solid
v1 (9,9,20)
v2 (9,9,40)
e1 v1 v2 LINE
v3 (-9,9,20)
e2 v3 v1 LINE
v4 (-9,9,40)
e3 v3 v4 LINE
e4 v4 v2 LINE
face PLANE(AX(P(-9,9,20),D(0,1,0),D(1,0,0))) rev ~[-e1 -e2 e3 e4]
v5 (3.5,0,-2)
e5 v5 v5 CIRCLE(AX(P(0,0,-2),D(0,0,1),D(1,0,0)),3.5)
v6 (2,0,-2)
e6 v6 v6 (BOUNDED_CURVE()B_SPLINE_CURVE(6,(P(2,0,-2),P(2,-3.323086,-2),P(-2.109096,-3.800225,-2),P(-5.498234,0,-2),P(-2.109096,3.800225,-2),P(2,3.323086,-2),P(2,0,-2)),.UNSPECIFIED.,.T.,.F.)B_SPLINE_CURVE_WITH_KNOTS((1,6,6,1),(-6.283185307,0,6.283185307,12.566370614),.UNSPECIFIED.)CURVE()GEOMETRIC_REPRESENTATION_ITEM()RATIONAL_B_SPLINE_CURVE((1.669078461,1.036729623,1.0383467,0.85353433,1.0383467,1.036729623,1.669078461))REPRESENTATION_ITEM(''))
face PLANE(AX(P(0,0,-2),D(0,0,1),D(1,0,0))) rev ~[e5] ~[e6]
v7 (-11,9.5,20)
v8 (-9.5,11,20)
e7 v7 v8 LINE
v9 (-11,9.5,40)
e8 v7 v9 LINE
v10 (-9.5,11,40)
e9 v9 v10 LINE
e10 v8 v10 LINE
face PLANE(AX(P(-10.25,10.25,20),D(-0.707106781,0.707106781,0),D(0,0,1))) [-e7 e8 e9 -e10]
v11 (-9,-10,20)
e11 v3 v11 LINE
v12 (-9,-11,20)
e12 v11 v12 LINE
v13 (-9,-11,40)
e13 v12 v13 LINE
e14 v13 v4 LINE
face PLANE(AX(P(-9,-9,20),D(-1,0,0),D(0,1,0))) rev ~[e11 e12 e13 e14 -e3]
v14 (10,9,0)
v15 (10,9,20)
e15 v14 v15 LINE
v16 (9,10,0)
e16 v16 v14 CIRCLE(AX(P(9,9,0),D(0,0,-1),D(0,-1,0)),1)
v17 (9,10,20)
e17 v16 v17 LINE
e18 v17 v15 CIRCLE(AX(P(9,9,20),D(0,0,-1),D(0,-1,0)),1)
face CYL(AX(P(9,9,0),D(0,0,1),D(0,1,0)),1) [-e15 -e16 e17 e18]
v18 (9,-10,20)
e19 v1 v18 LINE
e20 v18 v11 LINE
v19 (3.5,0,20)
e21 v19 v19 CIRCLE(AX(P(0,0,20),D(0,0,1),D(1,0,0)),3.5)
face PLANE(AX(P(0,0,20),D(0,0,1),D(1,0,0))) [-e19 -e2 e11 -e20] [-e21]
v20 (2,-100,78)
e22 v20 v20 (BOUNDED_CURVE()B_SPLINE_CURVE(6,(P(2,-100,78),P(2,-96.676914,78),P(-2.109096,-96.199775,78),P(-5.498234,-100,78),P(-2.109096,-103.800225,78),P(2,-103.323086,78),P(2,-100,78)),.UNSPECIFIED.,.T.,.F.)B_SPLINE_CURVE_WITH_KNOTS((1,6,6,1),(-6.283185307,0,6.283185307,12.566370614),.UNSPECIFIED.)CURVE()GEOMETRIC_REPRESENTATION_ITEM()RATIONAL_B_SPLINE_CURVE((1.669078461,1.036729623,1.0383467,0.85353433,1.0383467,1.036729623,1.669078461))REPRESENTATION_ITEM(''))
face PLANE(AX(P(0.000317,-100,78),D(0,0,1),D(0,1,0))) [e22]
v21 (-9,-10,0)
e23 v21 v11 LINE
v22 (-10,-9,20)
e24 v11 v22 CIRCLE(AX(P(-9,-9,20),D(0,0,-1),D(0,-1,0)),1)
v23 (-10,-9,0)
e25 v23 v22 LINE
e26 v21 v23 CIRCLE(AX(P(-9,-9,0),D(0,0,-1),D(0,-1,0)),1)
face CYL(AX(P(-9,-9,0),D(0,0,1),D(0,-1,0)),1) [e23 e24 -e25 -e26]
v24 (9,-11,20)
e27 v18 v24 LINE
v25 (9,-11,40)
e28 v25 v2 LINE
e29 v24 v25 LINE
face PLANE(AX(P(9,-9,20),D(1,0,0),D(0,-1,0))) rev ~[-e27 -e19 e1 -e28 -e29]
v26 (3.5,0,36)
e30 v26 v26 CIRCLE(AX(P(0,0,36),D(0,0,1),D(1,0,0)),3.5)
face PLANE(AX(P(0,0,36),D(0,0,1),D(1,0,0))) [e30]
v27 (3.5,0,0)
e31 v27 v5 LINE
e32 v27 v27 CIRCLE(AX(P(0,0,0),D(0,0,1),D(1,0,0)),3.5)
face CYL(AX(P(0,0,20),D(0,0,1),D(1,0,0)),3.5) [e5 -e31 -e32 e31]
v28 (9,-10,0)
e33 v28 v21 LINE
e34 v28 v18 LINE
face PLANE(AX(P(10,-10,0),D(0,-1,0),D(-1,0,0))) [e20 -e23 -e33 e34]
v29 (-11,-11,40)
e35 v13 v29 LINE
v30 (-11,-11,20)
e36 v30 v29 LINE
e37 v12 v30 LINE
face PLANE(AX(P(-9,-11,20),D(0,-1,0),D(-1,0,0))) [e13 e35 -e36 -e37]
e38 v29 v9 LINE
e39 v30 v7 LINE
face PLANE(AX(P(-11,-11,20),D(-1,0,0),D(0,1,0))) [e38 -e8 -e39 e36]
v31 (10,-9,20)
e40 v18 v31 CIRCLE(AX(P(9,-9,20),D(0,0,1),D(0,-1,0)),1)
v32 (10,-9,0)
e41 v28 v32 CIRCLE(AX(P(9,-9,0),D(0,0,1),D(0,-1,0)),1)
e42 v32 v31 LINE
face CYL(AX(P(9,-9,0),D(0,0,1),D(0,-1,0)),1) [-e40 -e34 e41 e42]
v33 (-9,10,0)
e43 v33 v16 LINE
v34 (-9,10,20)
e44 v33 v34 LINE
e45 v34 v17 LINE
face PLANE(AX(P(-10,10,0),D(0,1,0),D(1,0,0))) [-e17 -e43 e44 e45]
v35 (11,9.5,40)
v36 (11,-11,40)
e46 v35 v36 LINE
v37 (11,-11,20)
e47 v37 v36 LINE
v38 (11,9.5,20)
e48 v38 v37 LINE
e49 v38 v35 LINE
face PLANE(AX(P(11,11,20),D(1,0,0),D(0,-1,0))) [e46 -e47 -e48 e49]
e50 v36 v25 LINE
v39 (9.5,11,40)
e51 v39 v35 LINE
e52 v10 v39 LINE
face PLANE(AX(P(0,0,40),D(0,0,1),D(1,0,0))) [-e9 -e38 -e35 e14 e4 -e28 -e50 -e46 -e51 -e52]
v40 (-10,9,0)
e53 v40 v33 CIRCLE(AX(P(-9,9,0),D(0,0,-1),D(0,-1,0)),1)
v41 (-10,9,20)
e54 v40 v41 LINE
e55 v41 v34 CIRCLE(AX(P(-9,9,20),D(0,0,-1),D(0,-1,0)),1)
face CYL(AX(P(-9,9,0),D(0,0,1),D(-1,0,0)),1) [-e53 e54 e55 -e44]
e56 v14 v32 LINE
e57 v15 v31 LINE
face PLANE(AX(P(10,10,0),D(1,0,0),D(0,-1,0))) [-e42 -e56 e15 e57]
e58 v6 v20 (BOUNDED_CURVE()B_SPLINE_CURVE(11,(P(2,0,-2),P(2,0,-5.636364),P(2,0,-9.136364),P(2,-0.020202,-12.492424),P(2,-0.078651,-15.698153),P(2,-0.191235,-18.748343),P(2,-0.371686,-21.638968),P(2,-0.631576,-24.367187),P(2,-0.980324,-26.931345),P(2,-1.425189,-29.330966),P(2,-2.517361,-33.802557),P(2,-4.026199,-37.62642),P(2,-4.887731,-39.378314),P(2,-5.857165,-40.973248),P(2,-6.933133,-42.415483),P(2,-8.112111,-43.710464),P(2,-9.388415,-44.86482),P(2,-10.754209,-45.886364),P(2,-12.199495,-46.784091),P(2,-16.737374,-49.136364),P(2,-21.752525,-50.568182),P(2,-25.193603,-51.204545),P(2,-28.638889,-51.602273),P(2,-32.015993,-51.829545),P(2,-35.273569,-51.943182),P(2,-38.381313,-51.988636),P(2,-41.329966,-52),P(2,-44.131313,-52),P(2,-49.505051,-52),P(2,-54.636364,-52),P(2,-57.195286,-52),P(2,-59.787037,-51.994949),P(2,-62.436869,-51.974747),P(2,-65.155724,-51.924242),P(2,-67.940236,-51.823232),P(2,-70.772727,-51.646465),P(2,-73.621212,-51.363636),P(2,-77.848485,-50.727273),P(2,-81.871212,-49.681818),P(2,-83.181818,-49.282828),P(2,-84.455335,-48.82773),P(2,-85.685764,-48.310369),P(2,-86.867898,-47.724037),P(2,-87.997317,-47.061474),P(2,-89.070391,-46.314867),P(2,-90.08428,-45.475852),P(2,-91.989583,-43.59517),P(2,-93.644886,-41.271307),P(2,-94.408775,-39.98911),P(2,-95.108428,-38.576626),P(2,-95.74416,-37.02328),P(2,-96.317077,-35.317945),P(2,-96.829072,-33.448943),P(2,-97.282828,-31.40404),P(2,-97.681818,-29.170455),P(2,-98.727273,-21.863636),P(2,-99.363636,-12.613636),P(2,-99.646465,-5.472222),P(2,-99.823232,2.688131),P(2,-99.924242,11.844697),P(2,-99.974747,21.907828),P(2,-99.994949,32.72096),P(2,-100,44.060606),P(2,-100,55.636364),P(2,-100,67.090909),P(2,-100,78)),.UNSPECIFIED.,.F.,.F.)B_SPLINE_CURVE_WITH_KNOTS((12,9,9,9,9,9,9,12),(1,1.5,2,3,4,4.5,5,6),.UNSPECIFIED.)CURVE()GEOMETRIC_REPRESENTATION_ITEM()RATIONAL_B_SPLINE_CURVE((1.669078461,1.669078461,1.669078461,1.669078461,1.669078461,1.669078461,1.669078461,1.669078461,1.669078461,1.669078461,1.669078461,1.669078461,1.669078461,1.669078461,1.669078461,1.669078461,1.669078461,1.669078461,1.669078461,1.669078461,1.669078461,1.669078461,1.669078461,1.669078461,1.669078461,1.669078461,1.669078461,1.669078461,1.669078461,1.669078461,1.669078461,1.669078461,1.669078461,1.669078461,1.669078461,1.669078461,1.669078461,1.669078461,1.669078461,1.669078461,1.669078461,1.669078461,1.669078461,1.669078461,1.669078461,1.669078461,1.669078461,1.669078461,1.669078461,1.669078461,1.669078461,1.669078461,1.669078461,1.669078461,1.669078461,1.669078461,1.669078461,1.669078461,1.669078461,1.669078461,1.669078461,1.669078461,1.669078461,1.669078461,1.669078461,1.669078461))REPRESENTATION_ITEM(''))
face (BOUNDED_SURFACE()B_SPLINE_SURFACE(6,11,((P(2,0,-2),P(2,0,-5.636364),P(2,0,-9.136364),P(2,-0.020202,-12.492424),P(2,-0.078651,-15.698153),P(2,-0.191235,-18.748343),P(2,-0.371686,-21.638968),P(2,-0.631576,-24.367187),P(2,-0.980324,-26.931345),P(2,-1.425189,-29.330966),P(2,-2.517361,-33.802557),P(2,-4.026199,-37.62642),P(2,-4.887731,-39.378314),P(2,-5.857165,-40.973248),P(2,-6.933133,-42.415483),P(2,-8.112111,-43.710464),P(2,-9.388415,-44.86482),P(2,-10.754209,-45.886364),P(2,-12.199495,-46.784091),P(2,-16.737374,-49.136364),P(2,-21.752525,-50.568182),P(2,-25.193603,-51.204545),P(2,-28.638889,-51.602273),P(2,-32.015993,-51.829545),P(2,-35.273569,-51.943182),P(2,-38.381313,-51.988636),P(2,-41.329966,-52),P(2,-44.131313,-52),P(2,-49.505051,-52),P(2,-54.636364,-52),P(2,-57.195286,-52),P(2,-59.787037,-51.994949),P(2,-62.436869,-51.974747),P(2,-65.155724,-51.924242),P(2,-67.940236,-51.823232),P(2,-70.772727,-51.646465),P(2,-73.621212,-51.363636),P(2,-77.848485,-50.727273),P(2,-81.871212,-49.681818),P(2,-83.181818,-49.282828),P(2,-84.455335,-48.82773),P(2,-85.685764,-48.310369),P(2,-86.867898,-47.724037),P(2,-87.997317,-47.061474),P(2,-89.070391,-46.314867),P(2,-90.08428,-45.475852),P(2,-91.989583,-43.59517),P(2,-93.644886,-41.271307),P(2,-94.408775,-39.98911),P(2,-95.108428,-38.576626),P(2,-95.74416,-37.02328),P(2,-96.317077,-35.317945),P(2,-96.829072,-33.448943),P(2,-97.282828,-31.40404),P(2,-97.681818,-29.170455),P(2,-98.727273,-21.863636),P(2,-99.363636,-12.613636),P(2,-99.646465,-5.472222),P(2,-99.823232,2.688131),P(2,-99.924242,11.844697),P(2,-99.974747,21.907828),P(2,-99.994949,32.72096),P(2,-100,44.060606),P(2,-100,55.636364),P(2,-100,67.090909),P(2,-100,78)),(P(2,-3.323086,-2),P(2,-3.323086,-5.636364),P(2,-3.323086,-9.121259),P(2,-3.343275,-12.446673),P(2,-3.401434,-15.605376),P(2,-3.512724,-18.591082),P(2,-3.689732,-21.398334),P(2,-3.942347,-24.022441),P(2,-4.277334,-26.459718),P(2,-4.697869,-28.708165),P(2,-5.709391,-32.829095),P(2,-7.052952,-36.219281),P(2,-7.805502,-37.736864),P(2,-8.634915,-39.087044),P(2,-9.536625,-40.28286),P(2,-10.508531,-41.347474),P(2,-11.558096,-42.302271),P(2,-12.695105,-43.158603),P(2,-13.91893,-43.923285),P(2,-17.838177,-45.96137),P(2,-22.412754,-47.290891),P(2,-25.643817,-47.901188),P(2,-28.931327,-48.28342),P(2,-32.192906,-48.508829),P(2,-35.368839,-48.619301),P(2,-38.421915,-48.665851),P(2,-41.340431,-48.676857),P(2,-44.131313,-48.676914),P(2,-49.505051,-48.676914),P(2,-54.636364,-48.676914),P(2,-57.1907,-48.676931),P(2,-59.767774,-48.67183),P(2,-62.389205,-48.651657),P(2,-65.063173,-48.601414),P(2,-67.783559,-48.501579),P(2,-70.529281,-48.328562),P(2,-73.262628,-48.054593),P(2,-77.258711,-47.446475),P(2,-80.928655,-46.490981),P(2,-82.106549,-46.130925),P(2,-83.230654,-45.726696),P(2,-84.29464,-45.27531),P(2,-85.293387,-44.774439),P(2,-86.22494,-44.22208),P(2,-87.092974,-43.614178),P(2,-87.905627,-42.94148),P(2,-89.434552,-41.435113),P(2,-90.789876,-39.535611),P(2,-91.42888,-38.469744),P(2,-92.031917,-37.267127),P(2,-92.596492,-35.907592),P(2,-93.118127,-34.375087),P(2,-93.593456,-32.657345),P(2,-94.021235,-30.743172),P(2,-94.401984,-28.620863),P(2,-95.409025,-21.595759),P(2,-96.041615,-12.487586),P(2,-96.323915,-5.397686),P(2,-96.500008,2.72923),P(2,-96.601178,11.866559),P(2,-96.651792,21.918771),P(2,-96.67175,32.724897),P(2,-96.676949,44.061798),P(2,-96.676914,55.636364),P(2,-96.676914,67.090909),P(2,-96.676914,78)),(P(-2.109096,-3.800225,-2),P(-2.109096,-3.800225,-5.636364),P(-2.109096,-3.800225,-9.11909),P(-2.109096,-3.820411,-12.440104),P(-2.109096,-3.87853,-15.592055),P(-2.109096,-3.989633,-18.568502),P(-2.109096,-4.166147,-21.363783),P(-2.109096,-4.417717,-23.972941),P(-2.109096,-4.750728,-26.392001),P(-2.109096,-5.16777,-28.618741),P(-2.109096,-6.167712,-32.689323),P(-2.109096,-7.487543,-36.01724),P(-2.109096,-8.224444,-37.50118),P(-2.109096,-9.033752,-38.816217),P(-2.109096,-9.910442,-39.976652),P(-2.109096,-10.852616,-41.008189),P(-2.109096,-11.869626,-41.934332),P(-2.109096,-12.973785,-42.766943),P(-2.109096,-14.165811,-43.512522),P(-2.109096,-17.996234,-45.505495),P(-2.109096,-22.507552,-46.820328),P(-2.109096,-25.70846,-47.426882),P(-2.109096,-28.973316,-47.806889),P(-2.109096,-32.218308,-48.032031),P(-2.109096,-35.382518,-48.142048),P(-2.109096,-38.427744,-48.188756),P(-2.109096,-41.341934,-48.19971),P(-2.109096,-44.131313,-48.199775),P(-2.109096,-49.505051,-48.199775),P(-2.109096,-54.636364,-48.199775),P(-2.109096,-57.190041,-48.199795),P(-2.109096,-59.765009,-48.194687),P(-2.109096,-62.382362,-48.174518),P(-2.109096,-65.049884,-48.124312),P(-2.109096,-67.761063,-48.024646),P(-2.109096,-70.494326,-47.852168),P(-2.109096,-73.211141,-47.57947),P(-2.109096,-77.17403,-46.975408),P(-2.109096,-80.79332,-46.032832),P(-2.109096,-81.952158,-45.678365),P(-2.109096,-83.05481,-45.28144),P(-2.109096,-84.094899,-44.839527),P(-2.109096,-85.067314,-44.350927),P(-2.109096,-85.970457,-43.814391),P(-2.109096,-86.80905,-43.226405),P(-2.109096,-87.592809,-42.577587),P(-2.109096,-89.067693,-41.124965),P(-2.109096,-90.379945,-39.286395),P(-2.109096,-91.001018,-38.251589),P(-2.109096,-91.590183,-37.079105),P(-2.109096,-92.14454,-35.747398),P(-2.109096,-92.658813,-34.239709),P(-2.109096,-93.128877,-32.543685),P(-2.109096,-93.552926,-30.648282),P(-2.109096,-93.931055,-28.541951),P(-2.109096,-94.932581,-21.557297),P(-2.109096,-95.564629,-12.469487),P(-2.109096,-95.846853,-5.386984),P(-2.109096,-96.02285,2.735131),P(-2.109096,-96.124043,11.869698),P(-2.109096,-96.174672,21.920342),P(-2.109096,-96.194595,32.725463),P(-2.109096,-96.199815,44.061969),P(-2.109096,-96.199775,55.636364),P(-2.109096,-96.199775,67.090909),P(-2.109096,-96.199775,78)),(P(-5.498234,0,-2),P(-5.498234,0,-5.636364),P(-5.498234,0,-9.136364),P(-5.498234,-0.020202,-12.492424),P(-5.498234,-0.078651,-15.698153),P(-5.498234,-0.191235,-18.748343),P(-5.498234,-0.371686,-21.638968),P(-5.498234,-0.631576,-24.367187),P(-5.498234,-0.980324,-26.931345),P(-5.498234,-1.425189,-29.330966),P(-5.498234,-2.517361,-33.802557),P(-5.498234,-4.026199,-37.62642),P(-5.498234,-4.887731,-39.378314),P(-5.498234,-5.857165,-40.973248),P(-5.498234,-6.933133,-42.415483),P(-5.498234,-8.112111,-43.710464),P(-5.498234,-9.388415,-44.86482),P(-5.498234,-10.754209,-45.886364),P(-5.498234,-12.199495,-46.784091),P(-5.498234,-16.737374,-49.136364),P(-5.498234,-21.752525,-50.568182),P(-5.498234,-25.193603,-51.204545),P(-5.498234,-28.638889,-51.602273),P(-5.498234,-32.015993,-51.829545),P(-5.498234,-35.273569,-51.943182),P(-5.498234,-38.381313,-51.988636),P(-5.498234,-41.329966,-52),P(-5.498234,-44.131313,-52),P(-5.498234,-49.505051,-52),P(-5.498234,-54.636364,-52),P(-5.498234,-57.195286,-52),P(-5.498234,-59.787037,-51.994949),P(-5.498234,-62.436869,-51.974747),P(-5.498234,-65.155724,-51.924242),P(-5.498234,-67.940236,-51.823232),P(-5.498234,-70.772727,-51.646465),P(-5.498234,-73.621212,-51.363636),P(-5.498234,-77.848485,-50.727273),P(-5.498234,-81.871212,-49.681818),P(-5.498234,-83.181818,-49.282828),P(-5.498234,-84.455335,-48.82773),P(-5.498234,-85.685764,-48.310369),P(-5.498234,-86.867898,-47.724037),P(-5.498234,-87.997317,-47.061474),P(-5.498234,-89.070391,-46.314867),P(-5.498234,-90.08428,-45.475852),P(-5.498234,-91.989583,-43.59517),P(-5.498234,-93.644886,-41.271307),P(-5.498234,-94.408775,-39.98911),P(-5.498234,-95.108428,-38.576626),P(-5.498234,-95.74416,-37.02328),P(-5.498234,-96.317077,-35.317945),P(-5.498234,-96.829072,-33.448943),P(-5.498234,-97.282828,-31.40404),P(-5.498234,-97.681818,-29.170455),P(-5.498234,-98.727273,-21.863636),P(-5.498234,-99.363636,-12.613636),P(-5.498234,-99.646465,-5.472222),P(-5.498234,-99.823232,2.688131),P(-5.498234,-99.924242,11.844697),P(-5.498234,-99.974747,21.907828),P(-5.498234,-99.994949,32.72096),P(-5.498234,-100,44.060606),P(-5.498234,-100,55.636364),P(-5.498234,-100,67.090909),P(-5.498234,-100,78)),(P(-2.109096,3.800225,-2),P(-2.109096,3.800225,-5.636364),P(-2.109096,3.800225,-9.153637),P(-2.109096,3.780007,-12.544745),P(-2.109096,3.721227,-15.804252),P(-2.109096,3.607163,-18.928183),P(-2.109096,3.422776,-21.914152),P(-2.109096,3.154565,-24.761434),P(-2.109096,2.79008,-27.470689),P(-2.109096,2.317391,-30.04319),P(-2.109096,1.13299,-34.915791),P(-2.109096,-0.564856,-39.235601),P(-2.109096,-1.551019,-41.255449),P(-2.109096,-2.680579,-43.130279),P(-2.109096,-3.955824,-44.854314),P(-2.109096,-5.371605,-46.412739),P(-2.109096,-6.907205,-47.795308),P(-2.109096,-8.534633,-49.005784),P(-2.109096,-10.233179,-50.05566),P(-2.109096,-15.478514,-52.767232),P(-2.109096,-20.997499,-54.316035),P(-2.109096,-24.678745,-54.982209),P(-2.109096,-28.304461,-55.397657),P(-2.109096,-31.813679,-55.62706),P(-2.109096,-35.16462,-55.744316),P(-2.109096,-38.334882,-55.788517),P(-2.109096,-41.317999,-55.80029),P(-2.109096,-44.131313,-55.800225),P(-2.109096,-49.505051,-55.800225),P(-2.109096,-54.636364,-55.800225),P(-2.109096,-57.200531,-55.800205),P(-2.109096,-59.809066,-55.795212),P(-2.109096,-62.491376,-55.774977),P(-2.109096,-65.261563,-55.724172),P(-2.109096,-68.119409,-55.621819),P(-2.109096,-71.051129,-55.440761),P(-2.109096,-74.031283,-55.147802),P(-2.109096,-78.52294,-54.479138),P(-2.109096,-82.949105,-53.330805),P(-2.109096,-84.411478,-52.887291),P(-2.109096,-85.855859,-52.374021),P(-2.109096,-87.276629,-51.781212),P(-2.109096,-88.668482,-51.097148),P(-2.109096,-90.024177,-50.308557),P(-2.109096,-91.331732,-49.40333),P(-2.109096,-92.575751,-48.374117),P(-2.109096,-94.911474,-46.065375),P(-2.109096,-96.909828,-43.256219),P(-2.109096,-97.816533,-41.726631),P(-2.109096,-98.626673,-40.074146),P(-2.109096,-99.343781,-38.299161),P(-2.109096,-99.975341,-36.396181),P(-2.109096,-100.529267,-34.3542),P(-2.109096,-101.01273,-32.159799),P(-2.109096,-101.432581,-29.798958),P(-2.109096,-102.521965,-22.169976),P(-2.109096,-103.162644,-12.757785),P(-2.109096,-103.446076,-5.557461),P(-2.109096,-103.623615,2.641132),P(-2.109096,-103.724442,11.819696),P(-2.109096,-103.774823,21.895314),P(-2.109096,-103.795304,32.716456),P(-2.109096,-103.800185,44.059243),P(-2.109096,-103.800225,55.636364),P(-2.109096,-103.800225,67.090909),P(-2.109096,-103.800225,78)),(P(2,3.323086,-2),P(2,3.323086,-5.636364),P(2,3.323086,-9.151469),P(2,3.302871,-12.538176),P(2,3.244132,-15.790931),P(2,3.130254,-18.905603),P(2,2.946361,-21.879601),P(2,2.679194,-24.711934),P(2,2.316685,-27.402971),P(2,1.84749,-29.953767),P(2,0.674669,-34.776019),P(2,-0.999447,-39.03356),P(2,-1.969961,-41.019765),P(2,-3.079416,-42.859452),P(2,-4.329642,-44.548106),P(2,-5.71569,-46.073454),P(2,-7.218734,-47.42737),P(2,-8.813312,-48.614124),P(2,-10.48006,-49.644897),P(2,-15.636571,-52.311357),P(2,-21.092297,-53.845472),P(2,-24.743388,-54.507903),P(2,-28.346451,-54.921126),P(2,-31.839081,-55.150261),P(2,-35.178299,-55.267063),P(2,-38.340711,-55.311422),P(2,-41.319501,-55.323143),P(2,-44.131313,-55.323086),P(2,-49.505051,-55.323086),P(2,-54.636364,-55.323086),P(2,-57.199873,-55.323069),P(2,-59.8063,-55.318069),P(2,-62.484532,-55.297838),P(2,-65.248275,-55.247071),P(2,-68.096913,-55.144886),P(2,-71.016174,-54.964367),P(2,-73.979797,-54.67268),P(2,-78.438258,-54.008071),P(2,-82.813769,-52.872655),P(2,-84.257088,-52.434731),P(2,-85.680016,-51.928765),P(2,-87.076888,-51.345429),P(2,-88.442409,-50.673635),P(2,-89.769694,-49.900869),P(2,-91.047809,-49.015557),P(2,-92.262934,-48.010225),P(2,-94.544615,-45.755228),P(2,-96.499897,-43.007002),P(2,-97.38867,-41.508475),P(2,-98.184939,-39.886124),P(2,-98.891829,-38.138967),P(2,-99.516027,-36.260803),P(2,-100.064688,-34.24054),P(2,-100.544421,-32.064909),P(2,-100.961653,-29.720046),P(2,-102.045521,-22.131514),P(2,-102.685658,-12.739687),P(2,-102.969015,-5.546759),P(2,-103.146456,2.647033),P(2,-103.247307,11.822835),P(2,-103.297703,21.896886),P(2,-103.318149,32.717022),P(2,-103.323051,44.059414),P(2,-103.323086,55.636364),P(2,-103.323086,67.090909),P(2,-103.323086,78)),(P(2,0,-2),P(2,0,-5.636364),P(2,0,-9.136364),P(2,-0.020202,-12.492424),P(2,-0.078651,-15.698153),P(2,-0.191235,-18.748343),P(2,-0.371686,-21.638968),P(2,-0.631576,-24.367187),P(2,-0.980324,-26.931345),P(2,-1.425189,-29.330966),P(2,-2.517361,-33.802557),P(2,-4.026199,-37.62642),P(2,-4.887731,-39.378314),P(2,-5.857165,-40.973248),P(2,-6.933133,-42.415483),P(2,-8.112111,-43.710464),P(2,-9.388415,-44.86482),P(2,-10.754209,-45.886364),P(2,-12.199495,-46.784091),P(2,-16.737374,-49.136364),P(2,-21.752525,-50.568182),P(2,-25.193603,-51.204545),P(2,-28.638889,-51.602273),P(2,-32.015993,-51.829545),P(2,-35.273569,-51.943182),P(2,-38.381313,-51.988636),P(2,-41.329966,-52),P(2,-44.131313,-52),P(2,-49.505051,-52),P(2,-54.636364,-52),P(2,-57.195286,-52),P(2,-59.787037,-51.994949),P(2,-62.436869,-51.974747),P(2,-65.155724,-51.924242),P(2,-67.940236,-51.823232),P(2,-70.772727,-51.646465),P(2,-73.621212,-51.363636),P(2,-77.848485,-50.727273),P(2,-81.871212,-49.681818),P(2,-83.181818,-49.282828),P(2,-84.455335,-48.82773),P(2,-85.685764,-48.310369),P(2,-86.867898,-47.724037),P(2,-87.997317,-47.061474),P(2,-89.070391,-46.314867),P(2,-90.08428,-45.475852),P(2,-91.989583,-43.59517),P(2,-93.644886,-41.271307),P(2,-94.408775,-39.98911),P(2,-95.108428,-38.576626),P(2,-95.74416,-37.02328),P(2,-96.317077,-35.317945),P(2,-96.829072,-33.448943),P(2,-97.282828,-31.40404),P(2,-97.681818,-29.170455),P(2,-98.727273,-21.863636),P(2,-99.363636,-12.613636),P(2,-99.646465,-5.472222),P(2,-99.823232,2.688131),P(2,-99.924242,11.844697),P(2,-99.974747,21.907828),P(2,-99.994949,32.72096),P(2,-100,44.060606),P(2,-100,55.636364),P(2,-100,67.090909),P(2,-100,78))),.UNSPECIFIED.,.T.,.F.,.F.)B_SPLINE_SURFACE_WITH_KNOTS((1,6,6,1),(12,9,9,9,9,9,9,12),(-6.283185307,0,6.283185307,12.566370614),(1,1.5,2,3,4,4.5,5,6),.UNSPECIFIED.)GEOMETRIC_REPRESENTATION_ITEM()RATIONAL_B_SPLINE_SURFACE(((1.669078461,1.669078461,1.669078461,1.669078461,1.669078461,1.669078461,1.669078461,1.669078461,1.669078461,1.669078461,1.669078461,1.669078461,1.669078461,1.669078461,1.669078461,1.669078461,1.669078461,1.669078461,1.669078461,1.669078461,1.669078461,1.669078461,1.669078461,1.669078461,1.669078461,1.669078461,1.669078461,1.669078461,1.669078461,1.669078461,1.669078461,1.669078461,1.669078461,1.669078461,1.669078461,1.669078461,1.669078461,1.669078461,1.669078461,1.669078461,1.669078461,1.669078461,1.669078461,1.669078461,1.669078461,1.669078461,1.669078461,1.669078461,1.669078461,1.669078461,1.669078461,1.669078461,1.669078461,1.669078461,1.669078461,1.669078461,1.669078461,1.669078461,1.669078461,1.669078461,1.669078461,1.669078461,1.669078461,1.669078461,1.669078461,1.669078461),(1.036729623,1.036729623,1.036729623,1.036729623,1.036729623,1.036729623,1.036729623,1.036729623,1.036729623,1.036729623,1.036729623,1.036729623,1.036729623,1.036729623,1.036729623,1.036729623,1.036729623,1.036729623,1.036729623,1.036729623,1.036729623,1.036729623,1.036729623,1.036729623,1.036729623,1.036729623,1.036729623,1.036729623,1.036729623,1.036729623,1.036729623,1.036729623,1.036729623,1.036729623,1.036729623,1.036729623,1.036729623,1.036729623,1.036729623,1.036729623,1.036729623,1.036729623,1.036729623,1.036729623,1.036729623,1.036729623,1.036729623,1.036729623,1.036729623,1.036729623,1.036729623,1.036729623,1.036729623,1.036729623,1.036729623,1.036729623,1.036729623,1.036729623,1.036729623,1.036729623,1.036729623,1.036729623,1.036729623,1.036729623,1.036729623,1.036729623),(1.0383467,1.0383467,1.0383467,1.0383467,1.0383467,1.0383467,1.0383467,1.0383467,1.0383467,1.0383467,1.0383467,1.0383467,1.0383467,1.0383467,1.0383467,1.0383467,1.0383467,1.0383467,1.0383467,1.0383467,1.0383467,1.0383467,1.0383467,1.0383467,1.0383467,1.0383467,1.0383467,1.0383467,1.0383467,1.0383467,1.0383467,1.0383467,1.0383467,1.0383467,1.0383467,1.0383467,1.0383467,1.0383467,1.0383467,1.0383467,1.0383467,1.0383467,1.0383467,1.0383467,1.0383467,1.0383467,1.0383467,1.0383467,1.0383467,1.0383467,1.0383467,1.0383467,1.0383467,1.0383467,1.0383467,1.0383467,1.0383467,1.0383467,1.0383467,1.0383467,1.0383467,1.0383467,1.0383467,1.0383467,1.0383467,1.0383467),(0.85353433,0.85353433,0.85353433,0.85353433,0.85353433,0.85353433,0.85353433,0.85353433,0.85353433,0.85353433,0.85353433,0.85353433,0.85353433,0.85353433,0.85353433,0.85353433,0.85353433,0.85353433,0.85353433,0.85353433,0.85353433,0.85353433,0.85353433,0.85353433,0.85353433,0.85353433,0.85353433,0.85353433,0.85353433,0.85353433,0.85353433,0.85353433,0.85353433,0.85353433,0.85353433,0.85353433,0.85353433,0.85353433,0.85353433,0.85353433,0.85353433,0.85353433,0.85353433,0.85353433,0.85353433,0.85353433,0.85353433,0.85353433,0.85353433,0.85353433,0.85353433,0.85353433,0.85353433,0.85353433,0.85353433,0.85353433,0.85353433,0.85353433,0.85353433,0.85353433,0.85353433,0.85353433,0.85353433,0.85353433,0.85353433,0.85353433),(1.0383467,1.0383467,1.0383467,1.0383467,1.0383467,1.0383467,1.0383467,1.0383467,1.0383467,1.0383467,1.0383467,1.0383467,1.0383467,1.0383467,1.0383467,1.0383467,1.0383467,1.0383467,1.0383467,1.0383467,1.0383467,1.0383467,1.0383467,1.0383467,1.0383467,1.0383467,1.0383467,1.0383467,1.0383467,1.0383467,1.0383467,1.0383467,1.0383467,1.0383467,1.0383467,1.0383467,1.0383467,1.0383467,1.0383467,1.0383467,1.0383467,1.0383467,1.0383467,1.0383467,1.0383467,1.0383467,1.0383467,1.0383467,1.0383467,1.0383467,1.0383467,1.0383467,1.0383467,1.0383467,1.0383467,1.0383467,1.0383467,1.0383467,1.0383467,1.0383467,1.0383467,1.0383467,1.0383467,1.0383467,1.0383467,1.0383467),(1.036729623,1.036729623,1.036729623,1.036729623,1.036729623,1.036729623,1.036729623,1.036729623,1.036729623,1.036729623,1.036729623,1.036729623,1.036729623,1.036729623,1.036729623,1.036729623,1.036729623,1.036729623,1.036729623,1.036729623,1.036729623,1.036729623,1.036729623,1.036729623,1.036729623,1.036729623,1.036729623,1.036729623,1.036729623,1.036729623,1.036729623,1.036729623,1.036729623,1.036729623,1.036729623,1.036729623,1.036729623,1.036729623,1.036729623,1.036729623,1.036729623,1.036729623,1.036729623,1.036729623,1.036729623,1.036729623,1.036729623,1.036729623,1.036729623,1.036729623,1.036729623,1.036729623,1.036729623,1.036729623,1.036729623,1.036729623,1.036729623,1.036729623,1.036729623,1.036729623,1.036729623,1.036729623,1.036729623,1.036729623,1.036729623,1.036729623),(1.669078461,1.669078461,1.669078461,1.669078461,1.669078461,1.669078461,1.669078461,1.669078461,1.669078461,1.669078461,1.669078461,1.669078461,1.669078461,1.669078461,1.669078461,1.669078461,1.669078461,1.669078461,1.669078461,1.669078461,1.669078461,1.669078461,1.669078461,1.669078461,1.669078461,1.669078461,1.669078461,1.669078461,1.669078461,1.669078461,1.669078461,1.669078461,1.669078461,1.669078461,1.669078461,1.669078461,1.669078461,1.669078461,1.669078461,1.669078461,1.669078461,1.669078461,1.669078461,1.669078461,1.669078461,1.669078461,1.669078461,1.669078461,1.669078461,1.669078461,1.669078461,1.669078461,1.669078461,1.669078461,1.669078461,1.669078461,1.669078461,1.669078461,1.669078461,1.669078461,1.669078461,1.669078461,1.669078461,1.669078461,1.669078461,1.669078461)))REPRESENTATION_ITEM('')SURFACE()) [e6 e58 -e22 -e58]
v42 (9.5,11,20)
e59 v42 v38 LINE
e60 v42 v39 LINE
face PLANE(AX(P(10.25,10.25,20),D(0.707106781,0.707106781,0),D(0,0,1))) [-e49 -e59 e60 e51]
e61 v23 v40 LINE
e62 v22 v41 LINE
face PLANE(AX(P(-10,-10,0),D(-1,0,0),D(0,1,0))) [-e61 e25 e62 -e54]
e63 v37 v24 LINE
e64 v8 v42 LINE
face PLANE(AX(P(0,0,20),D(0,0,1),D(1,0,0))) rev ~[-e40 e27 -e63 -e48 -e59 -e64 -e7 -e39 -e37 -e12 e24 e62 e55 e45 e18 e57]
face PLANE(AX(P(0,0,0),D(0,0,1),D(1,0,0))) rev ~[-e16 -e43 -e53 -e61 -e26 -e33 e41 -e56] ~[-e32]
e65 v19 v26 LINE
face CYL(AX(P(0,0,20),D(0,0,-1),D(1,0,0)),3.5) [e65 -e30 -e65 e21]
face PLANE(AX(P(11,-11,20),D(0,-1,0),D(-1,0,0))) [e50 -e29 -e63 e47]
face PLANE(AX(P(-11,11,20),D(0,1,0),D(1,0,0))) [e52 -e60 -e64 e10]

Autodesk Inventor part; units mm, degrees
ref_plane "YZ Plane" through (0, 0, 0) normal (1, 0, 0) x (0, 1, 0)
ref_plane "XZ Plane" through (0, 0, 0) normal (0, 1, 0) x (-1, 0, 0)
ref_plane "XY Plane" through (0, 0, 0) normal (0, 0, 1) x (1, 0, 0)
sketch "Sketch1" plane through (0, 0, 0) normal (0, 0, 1) x (1, 0, 0)
  line L0 (10, -10) -> (-10, -10)
  line L1 (-10, -10) -> (-10, 10)
  line L2 (-10, 10) -> (10, 10)
  line L3 (10, 10) -> (10, -10)
  line L4 (10, -10) -> (-10, 10) construction
  line L5 (-10, -10) -> (10, 10) construction
  point P0 (0, 0)
  dimension "d0" = 20
  dimension "d1" = 20
extrude "Extrusion1" add sketch "Sketch1" along normal blind 20
sketch "Sketch2" plane through (0, 0, 20) normal (0, 0, 1) x (1, 0, 0)
  line L0 (10, 10) -> (-10, 10) projected
  line L1 (-10, 10) -> (-10, -10) projected
  line L2 (-10, -10) -> (10, -10) projected
  line L3 (10, -10) -> (10, 10) projected
  line L4 (-11, 11) -> (11, 11)
  line L5 (11, 11) -> (11, -11)
  line L6 (11, -11) -> (-11, -11)
  line L7 (-11, -11) -> (-11, 11)
  line L8 (-9, 9) -> (9, 9)
  line L9 (9, 9) -> (9, -11)
  line L10 (9, -9) -> (-9, -9)
  line L11 (-9, -11) -> (-9, 9)
  point P0 (0, 0)
  dimension "d4" = 1
  dimension "d5" = 1
extrude "Extrusion2" add sketch "Sketch2" along normal blind 20 contours L3 L2 L9 L8 L11 L1 L0 | L0 L1 L2 L11 L6 L7 L4 L5 L9 L3
chamfer "Chamfer1" distance 1.5 angle 45 2 edges at (11, 11, 30) (-11, 11, 30)
fillet "Fillet1" radius 1 4 edges at (10, 10, 10) (-10, 10, 10) (10, -10, 10) (-10, -10, 10)
sketch "Sketch3" plane through (0, 0, 20) normal (0, 0, 1) x (1, 0, 0)
  circle A0 centre (0, 0) radius 3.5
  dimension "d12" = 7
extrude "Extrusion3" add sketch "Sketch3" along normal blind 16 and the other way blind 22
ref_plane "Work Plane1" through (0, -100, 78) normal (0, 0, 1) x (1, 0, 0)
sketch "Sketch4" plane through (0, -100, 78) normal (0, 0, 1) x (1, 0, 0)
  circle A0 centre (0, 0) radius 2
  point P0 (0, 100)
  dimension "d17" = 4
sketch3d "3D Sketch1"
  spline S0 degree 4 poles (0, 0, -2) (0, 0, -22) (0, 0, -52) (0, -40, -52) (0, -60, -52) (0, -100, -52) (0, -100, -22) (0, -100, 48) (0, -100, 78) knots 1 1 1 1 1 2 3 4 5 6 6 6 6 6
  dimension "d20" = 40
  dimension "d21" = 70
  dimension "d22" = 100
sweep "Sweep1" add profiles "Sketch4" path "3D Sketch1"
properties part number "sensor"
